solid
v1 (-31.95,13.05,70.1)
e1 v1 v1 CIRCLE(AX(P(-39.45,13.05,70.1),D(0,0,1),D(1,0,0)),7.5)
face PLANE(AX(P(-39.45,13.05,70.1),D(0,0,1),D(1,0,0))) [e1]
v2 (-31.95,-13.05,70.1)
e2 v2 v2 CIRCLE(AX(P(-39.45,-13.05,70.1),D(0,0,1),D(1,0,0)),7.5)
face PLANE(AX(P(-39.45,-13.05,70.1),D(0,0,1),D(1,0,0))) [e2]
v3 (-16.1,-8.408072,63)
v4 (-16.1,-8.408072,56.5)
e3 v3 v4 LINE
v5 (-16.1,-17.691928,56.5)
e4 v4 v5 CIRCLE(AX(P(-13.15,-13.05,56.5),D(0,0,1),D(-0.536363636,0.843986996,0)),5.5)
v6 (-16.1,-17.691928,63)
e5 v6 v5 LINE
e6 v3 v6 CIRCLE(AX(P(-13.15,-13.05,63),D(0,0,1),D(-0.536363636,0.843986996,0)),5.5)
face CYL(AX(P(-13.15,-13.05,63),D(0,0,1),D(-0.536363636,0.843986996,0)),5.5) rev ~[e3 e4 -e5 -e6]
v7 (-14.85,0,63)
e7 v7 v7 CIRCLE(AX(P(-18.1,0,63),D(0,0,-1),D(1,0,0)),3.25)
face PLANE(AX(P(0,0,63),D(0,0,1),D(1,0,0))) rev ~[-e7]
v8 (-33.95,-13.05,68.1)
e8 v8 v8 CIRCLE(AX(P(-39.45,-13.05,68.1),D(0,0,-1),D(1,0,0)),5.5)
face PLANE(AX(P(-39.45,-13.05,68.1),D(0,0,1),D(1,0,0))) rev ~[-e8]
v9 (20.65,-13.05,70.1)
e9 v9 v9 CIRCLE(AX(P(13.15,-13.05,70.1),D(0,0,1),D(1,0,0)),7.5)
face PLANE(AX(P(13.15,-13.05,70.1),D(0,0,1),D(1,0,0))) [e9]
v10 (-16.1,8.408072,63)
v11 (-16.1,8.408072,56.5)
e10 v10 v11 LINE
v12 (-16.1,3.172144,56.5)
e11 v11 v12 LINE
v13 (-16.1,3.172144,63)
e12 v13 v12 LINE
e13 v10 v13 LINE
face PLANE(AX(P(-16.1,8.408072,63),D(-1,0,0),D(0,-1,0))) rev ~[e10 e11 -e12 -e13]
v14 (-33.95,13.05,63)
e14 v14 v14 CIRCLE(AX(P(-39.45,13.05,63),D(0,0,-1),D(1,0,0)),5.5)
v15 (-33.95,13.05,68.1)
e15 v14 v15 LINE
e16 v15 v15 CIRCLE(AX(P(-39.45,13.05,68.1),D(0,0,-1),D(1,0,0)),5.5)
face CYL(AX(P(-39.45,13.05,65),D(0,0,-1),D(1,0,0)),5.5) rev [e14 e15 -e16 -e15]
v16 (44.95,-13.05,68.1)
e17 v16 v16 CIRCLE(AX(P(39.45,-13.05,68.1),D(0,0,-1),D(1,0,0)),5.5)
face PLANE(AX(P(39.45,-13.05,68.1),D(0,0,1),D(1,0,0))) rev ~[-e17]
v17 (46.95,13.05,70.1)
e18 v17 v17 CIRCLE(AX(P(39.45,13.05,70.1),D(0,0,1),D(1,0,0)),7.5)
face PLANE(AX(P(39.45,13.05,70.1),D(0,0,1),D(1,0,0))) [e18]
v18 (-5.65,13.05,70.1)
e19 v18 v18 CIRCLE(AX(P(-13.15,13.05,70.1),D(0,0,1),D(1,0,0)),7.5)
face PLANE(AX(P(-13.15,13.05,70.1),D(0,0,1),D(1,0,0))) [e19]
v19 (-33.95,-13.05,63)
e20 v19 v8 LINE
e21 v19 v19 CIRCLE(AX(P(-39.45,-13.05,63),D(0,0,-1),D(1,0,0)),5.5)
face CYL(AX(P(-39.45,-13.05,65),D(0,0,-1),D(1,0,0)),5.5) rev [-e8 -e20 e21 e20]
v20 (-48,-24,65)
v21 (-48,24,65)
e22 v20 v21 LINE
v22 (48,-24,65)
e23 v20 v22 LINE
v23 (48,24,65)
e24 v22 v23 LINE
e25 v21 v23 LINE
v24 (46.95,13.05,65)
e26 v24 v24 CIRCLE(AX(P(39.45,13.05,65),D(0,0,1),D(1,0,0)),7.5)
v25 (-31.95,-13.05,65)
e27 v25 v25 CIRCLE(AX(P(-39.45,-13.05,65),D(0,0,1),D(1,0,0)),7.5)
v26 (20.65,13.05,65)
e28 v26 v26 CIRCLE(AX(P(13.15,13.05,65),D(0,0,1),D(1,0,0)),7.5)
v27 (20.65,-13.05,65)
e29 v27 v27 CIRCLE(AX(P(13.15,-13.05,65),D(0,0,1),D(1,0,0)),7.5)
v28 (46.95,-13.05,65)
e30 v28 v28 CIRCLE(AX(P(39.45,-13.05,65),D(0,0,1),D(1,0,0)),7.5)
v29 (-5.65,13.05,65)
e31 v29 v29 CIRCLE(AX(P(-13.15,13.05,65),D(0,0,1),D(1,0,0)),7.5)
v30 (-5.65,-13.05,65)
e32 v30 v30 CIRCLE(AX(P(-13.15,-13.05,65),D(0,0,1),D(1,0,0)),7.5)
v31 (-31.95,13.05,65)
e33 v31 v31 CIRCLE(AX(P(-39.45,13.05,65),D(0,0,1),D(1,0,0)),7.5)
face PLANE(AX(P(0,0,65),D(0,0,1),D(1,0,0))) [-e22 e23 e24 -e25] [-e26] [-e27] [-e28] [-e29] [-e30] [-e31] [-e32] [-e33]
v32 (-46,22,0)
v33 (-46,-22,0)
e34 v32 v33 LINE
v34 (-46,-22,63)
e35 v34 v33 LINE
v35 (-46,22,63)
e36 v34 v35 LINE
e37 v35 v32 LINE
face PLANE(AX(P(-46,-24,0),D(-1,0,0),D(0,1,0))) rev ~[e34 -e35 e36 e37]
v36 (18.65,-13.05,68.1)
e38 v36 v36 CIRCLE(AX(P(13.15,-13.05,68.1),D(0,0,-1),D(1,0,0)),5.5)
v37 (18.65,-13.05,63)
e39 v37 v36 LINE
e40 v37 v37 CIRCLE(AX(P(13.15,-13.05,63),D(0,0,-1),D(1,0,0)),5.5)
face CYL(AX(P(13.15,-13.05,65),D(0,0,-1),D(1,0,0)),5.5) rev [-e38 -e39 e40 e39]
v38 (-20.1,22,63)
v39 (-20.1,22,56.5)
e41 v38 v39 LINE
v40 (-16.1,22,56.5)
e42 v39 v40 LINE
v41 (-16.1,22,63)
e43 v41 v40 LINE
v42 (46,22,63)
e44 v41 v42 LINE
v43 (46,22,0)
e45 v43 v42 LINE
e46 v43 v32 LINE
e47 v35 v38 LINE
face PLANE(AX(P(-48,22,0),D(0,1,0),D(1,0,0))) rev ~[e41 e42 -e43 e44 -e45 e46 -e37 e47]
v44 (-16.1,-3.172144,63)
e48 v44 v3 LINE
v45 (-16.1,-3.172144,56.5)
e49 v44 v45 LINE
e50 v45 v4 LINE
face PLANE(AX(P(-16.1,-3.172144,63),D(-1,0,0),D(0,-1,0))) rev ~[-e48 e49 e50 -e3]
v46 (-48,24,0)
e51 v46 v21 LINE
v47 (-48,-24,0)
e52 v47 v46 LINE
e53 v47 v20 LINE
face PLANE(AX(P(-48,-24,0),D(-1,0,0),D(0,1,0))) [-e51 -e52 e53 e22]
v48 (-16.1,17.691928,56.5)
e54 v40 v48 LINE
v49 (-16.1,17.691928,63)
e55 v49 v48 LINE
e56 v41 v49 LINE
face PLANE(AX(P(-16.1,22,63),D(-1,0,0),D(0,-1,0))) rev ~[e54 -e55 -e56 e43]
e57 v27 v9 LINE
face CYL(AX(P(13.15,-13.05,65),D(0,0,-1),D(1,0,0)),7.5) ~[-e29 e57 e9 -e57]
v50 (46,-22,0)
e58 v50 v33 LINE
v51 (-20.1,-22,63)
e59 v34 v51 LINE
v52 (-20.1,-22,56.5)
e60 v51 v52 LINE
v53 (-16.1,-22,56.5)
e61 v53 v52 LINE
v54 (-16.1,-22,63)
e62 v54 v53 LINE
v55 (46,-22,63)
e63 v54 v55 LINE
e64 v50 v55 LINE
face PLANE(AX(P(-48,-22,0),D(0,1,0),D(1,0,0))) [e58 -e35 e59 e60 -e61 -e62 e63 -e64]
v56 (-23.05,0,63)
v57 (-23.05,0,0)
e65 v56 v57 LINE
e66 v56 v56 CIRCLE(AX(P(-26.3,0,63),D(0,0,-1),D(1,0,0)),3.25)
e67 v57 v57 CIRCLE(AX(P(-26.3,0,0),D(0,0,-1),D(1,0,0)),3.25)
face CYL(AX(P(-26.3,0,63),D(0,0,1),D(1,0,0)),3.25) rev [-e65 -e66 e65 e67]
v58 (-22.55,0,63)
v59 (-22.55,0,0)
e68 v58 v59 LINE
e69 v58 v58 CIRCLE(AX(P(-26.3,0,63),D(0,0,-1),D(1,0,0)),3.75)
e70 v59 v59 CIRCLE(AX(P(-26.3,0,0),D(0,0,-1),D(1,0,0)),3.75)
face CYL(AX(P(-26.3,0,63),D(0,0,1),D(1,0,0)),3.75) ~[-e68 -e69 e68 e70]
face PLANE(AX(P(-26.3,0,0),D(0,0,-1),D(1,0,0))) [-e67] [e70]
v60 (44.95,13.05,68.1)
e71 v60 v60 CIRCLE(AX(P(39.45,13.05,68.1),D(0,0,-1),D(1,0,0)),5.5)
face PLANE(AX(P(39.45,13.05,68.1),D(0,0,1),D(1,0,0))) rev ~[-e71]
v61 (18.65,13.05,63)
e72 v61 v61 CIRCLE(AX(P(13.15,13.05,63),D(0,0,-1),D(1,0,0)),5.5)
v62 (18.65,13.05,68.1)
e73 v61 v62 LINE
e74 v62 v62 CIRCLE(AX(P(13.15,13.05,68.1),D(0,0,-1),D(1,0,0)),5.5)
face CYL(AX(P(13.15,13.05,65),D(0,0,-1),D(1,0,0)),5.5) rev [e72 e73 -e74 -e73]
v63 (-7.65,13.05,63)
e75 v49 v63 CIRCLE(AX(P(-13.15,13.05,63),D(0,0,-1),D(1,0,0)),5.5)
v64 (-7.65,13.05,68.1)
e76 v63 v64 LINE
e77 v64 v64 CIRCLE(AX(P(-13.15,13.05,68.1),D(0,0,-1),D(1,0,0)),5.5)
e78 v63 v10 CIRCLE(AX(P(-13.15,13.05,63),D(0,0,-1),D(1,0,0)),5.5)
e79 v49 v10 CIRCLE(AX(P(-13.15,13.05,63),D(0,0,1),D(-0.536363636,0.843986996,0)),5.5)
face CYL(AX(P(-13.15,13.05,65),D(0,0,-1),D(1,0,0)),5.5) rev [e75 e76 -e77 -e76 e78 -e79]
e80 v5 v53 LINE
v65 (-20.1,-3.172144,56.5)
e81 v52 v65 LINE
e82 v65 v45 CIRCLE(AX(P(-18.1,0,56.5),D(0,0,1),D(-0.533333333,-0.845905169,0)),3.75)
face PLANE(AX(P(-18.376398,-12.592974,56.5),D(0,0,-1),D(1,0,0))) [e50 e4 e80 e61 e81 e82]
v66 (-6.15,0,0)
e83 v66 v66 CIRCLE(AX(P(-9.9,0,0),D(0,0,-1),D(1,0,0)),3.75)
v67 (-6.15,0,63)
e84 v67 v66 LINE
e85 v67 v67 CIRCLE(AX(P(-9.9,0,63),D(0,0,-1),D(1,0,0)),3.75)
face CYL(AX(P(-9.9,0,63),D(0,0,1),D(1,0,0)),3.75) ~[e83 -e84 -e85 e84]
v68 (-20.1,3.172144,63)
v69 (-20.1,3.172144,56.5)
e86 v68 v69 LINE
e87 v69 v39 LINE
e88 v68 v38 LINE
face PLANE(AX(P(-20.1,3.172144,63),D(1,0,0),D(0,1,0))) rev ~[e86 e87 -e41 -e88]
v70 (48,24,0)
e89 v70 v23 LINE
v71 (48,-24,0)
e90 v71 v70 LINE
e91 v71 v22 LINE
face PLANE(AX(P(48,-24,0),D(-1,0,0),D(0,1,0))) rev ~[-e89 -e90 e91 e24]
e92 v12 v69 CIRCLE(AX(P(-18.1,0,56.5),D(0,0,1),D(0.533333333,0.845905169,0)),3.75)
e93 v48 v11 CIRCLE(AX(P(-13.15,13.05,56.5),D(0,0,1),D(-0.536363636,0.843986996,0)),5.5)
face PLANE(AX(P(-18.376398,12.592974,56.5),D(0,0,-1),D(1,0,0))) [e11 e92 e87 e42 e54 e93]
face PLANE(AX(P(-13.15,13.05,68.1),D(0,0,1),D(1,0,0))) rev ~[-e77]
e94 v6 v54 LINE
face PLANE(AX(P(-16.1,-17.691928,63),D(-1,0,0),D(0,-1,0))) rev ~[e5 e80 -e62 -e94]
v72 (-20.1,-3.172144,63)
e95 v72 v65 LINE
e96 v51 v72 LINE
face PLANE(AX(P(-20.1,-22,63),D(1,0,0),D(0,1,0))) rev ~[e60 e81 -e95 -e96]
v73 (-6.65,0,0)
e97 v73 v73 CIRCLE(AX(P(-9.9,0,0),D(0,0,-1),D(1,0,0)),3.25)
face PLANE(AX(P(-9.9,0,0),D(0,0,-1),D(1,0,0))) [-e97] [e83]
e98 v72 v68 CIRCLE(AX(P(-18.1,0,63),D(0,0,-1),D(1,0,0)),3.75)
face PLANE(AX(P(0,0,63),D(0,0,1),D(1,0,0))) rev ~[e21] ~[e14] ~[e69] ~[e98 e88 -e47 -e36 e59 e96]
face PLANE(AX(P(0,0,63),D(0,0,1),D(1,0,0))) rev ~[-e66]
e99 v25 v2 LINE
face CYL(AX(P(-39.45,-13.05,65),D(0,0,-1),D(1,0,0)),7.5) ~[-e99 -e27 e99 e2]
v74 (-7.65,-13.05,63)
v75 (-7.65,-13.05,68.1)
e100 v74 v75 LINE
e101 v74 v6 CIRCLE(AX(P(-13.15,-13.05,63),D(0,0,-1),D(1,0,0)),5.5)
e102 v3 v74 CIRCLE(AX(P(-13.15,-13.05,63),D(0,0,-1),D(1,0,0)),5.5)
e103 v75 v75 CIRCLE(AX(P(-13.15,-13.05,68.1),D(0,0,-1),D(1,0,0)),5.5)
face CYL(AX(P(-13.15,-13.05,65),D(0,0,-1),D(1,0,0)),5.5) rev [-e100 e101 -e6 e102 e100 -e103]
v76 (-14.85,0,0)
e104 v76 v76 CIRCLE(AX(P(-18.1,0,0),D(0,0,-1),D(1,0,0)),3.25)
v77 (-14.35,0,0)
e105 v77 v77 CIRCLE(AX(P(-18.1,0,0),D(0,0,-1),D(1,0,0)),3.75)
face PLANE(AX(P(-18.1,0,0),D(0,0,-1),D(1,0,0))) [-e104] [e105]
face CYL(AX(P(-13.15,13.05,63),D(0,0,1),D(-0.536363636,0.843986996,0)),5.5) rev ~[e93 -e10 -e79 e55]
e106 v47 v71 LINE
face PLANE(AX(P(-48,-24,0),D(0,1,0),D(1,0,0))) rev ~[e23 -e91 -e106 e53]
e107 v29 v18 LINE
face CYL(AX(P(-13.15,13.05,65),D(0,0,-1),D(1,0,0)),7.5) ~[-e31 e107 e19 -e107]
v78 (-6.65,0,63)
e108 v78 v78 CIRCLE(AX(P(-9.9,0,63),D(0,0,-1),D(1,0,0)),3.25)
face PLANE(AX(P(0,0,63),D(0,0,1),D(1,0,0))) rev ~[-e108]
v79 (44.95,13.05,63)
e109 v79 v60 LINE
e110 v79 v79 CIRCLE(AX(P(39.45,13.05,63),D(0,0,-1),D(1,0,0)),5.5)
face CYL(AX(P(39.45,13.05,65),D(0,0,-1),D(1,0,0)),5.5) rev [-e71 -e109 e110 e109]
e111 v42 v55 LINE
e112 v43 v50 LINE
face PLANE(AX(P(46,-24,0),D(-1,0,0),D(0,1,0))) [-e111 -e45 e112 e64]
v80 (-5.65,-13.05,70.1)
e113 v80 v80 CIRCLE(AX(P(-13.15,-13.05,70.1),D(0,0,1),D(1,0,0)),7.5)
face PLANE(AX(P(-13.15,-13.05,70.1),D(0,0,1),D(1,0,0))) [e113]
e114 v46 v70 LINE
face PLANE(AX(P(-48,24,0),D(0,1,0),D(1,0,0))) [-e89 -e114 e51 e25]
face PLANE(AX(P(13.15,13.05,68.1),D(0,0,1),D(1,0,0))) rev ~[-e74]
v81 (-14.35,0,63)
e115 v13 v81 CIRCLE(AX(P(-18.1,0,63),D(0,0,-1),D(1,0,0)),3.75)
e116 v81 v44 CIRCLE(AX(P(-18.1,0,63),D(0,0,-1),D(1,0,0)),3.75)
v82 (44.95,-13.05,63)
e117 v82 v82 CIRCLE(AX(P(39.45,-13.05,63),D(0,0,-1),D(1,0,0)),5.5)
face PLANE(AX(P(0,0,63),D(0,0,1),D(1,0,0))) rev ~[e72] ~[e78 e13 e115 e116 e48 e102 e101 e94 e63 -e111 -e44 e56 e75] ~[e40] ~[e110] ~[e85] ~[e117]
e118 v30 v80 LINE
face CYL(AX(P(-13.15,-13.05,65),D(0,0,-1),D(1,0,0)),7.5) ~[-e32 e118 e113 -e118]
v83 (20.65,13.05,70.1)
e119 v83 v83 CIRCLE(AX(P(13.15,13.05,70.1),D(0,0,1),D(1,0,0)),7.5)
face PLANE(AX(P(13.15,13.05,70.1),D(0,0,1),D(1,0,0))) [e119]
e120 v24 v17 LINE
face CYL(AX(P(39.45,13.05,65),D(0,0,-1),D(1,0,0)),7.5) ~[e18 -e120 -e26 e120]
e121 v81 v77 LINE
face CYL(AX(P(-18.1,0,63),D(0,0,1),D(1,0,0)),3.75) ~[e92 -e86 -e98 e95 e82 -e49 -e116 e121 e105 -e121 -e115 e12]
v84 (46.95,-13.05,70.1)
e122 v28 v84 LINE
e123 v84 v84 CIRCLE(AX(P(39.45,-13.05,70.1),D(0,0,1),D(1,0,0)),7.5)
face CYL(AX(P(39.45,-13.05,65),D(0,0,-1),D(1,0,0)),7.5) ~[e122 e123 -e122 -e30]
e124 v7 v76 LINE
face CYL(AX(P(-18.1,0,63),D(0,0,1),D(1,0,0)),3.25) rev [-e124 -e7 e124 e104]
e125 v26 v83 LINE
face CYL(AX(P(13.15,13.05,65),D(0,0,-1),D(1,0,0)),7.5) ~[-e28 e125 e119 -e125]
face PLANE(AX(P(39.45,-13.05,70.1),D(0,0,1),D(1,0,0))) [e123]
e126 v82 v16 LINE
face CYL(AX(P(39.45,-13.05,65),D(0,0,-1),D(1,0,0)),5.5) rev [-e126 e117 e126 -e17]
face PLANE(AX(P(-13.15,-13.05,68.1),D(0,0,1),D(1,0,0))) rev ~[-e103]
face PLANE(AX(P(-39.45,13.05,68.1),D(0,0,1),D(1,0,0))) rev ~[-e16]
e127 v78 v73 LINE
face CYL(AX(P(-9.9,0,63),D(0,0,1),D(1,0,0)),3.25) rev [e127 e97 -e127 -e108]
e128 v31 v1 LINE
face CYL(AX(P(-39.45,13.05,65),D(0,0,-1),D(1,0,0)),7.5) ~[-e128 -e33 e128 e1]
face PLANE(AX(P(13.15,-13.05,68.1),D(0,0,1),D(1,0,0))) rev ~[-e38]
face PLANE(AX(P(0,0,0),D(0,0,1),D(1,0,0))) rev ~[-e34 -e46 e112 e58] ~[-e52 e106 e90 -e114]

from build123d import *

# Parameters (mm, degrees)
F0_W     = 96
F0_H     = 48
F1_DEPTH = 65
F2_R     = 7.5
F3_DEPTH = 5.1
F4_T     = -2
F5_R     = 3.75
F5_R_2   = 3.25
F6_DEPTH = 63
F8_DEPTH = 6.5


# Not quite as in the source:
# - after a boolean that leaves OpenCascade's solid faulty, fix() repairs it


with BuildPart() as f1:
    # F0 (on Top) → F1 (new body)
    with BuildSketch(Plane.XY):
        Rectangle(F0_W, F0_H)
    extrude(amount=F1_DEPTH)

    # F2 (on face) → F3 (join)
    with BuildSketch(Plane.XY.offset(65)):
        with Locations((-39.45, 13.05)):
            Circle(F2_R)
        with Locations((-13.15, 13.05)):
            Circle(F2_R)
        with Locations((39.45, 13.05)):
            Circle(F2_R)
        with Locations((39.45, -13.05)):
            Circle(F2_R)
        with Locations((13.15, -13.05)):
            Circle(F2_R)
        with Locations((-13.15, -13.05)):
            Circle(F2_R)
        with Locations((-39.45, -13.05)):
            Circle(F2_R)
        with Locations((13.15, 13.05)):
            Circle(F2_R)
    extrude(amount=F3_DEPTH)

    # F4
    f4_openings = [f1.faces().sort_by_distance(p)[0] for p in [
        (0, 0, 0),
    ]]
    offset(amount=F4_T, openings=f4_openings, kind=Kind.INTERSECTION)

    # F5 (on face) → F6 (join, through all)
    with BuildSketch(Plane(origin=(0, 0, 63), x_dir=(1, 0, 0), z_dir=(0, 0, -1))):
        with Locations((-26.3, 0)):
            Circle(F5_R)
        with Locations((-26.3, 0)):
            Circle(F5_R_2, mode=Mode.SUBTRACT)
        with Locations((-18.1, 0)):
            Circle(F5_R)
        with Locations((-18.1, 0)):
            Circle(F5_R_2, mode=Mode.SUBTRACT)
        with Locations((-9.9, 0)):
            Circle(F5_R)
        with Locations((-9.9, 0)):
            Circle(F5_R_2, mode=Mode.SUBTRACT)
    extrude(amount=F6_DEPTH)

    # F7 (on face) → F8 (join)
    with BuildSketch(Plane(origin=(0, 0, 63), x_dir=(1, 0, 0), z_dir=(0, 0, -1))):
        with BuildLine():
            ThreePointArc((-20.1, 3.1721443851), (-18.1, 3.75), (-16.1, 3.1721443851))
            Line((-16.1, 3.1721443851), (-16.1, 8.4080715214))
            ThreePointArc((-16.1, 8.4080715214), (-18.65, 13.05), (-16.1, 17.6919284786))
            Line((-16.1, 17.6919284786), (-16.1, 22))
            Line((-16.1, 22), (-20.1, 22))
            Line((-20.1, 22), (-20.1, 3.1721443851))
        make_face()
        with BuildLine():
            Line((-16.1, -8.4080715214), (-16.1, -3.1721443851))
            ThreePointArc((-16.1, -3.1721443851), (-18.1, -3.75), (-20.1, -3.1721443851))
            Line((-20.1, -3.1721443851), (-20.1, -22))
            Line((-20.1, -22), (-16.1, -22))
            Line((-16.1, -22), (-16.1, -17.6919284786))
            ThreePointArc((-16.1, -17.6919284786), (-18.65, -13.05), (-16.1, -8.4080715214))
        make_face()
    extrude(amount=F8_DEPTH)

    add(f1.part.fix(), mode=Mode.REPLACE)


solid = f1.part
